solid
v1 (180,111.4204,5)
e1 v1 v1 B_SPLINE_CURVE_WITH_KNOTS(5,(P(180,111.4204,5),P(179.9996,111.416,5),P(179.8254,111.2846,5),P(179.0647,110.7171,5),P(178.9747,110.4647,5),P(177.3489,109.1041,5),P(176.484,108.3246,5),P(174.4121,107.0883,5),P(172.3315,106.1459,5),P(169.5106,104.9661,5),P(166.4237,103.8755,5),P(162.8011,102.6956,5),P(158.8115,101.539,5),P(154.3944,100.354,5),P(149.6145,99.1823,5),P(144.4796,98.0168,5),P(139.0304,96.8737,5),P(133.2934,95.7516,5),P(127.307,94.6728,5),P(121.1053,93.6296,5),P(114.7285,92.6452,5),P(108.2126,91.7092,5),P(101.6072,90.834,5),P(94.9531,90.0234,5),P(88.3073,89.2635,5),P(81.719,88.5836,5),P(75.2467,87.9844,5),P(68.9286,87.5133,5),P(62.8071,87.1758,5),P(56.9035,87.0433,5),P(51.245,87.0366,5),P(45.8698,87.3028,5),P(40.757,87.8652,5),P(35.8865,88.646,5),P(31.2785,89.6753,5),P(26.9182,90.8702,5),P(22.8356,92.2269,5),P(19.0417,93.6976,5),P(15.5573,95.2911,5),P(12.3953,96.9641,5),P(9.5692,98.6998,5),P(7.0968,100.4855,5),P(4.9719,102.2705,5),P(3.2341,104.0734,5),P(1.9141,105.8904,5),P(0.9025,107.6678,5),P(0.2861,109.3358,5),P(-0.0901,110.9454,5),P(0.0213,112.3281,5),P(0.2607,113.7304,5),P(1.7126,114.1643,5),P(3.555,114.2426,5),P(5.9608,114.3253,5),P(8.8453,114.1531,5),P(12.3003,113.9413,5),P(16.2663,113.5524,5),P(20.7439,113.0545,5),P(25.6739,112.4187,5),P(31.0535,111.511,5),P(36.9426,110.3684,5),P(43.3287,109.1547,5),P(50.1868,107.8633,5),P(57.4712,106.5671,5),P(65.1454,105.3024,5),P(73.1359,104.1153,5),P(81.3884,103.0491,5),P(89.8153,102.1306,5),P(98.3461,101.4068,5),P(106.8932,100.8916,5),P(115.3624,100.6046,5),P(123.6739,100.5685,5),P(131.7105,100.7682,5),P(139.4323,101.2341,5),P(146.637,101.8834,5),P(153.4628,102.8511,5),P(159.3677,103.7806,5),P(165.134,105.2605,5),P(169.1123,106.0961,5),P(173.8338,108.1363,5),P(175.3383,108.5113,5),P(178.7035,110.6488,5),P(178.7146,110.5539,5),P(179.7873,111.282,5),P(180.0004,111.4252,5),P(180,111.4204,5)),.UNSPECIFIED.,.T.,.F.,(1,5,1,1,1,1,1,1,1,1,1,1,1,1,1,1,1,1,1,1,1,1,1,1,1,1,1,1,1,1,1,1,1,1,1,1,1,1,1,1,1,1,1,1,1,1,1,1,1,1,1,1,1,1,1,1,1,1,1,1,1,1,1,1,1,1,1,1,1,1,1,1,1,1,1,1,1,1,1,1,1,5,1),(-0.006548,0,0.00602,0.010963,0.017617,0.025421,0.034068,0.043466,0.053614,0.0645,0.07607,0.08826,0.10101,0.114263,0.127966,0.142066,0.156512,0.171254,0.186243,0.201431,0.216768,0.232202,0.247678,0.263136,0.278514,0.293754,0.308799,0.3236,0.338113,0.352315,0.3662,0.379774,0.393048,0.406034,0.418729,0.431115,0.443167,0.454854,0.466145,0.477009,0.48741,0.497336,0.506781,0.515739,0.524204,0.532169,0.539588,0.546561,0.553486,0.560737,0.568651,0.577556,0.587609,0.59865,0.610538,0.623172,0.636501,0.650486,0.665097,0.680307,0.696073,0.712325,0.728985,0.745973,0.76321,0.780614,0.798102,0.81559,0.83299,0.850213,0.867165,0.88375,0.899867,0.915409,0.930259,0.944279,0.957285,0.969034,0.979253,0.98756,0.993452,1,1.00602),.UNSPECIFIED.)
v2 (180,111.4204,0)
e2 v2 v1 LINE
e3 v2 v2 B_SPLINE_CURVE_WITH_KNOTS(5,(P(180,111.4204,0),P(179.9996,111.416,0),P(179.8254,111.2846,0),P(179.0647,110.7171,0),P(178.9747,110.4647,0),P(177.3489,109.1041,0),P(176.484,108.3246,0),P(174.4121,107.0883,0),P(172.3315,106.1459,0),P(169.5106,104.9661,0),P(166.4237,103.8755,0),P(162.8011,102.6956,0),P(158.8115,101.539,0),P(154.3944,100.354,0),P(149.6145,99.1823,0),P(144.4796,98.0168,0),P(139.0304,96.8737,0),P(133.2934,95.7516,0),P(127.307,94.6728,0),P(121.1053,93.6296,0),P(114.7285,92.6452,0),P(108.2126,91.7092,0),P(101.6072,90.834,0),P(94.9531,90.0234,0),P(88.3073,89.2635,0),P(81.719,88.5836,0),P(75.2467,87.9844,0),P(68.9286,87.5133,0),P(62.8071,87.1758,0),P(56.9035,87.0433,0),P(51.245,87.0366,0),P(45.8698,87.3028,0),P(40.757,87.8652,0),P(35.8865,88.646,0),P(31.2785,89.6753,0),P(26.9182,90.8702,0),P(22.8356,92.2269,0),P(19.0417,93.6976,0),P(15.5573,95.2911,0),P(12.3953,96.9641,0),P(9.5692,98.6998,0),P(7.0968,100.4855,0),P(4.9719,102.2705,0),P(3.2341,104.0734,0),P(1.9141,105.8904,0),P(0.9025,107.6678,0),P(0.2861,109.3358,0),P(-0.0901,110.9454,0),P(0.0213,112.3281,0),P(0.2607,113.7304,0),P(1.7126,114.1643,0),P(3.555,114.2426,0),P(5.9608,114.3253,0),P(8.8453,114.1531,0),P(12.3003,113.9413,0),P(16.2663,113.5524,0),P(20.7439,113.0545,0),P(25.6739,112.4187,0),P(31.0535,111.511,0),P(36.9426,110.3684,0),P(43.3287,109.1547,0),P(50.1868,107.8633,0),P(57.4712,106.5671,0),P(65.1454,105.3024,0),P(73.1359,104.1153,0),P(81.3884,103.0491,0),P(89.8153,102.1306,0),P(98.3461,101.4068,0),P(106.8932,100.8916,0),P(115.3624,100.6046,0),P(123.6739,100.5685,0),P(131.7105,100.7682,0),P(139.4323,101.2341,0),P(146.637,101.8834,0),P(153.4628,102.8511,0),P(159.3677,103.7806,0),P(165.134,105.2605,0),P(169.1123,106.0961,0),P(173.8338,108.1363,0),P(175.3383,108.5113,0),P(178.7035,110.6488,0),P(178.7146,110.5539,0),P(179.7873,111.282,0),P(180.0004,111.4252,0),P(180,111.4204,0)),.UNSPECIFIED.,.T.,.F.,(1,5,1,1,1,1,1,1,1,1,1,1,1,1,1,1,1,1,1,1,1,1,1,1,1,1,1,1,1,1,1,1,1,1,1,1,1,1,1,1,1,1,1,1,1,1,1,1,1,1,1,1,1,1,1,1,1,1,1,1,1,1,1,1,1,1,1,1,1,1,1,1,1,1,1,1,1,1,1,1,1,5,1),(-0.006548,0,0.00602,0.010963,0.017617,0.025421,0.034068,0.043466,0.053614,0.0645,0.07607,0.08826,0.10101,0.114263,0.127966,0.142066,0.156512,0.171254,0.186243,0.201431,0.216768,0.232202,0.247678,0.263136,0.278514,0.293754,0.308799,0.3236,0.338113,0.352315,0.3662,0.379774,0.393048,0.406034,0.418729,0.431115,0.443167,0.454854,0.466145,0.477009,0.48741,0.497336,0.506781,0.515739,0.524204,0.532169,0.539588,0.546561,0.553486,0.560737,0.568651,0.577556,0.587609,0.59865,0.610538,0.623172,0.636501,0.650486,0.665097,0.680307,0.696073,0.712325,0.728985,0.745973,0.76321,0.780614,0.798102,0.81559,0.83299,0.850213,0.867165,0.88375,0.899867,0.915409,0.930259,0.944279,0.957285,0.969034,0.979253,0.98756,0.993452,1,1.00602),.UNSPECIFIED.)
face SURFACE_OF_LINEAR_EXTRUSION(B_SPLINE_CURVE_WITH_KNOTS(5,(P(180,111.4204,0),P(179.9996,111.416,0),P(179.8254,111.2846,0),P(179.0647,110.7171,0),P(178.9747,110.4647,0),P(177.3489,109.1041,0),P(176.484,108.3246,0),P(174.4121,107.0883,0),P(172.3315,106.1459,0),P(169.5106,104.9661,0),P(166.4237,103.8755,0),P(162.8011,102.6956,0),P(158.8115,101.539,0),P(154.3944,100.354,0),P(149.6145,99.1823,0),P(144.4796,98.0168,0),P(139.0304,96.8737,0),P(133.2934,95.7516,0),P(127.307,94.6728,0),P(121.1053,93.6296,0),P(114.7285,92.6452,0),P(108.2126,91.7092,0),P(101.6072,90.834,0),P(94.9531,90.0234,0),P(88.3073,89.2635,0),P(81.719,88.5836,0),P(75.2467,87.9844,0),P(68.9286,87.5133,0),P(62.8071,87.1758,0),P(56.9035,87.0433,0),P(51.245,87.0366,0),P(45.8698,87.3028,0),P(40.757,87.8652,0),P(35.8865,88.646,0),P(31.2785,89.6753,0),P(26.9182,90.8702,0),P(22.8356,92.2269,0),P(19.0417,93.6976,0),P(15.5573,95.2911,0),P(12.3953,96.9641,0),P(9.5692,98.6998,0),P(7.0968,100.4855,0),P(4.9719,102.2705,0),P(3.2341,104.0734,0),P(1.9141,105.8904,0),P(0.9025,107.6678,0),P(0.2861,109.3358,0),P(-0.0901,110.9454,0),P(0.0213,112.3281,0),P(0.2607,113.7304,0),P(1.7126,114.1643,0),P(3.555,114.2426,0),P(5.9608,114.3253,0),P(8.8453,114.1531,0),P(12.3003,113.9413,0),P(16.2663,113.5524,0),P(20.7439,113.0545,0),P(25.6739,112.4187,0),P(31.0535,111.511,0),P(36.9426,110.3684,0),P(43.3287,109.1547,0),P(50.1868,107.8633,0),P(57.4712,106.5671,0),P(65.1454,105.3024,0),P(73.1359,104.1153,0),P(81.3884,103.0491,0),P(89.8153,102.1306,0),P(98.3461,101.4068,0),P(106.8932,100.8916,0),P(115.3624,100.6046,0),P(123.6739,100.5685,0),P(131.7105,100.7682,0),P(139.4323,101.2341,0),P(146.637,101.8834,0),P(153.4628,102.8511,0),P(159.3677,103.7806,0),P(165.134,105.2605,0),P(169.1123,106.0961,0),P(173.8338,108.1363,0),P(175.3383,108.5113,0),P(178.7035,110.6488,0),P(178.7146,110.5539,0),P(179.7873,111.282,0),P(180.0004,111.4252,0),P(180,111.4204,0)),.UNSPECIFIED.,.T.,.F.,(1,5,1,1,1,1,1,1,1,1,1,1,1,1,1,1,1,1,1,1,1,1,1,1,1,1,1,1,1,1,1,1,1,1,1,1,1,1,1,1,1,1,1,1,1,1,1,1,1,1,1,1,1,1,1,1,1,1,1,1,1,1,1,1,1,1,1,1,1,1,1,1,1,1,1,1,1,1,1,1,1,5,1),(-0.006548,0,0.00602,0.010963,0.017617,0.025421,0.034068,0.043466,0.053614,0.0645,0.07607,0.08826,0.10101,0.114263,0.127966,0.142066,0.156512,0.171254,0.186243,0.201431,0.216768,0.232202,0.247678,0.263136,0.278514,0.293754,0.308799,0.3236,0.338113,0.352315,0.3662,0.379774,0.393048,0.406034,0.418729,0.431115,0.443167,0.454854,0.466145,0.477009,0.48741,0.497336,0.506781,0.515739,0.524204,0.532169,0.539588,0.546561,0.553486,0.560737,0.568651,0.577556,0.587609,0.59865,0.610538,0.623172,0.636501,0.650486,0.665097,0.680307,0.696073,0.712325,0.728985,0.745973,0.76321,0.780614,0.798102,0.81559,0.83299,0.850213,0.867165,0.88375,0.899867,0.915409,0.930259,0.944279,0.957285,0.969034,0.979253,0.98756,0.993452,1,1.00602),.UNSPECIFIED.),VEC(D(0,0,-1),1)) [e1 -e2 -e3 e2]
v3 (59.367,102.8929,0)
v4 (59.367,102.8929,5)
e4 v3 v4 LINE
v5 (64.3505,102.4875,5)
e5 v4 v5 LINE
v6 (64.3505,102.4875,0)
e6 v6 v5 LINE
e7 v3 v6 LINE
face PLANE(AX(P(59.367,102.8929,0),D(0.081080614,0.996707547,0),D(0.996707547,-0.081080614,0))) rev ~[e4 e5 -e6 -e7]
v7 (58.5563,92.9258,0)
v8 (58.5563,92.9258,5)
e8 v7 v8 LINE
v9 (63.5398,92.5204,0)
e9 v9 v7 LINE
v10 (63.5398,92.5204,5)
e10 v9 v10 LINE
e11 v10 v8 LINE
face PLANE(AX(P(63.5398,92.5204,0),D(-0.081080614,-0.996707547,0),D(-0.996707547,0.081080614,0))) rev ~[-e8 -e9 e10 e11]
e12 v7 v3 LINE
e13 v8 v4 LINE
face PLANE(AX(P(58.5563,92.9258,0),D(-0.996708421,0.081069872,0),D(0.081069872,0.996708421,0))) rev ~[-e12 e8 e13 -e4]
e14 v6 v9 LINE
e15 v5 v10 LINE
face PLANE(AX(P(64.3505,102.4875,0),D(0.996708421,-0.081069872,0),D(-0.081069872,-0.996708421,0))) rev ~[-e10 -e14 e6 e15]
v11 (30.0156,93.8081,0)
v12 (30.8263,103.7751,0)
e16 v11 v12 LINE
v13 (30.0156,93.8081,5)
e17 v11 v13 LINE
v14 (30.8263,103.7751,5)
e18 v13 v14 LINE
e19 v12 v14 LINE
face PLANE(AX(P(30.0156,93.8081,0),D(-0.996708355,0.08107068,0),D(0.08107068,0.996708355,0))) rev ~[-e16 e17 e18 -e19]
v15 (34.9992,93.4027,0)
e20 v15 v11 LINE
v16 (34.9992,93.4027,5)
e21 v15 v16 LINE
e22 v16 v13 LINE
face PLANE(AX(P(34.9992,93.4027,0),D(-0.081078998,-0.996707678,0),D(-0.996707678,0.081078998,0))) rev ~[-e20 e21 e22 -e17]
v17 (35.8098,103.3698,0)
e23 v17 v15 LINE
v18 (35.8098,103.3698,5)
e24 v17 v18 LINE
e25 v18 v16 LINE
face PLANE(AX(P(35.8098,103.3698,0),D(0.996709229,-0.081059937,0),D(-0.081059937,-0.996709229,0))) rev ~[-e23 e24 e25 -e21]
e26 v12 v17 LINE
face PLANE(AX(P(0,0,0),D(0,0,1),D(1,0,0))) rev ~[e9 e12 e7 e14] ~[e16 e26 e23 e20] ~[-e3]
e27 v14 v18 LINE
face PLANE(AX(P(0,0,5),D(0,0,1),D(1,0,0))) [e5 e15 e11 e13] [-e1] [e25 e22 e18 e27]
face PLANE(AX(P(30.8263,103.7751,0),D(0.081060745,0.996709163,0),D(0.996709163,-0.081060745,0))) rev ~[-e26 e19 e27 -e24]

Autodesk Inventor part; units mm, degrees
ref_plane "YZ Plane" through (0, 0, 0) normal (1, 0, 0) x (0, 1, 0)
ref_plane "XZ Plane" through (0, 0, 0) normal (0, 1, 0) x (-1, 0, 0)
ref_plane "XY Plane" through (0, 0, 0) normal (0, 0, 1) x (1, 0, 0)
sketch "Sketch2" plane through (0, 0, 0) normal (0, 0, 1) x (1, 0, 0)
  spline S0 degree 5 poles (180, 111.4204) (179.9996, 111.416) (179.8254, 111.2846) (179.0647, 110.7171) (178.9747, 110.4647) (177.3489, 109.1041) (176.484, 108.3246) (174.4121, 107.0883) (172.3315, 106.1459) (169.5106, 104.9661) (166.4237, 103.8755) (162.8011, 102.6956) (158.8115, 101.539) (154.3944, 100.354) (149.6145, 99.1823) (144.4796, 98.0168) (139.0304, 96.8737) (133.2934, 95.7516) (127.307, 94.6728) (121.1053, 93.6296) (114.7285, 92.6452) (108.2126, 91.7092) (101.6072, 90.834) (94.9531, 90.0234) (88.3073, 89.2635) (81.719, 88.5836) (75.2467, 87.9844) (68.9286, 87.5133) (62.8071, 87.1758) (56.9035, 87.0433) (51.245, 87.0366) (45.8698, 87.3028) (40.757, 87.8652) (35.8865, 88.646) (31.2785, 89.6753) (26.9182, 90.8702) (22.8356, 92.2269) (19.0417, 93.6976) (15.5573, 95.2911) (12.3953, 96.9641) (9.5692, 98.6998) (7.0968, 100.4855) (4.9719, 102.2705) (3.2341, 104.0734) (1.9141, 105.8904) (0.9025, 107.6678) (0.2861, 109.3358) (-0.0901, 110.9454) (0.0213, 112.3281) (0.2607, 113.7304) (1.7126, 114.1643) (3.555, 114.2426) (5.9608, 114.3253) (8.8453, 114.1531) (12.3003, 113.9413) (16.2663, 113.5524) (20.7439, 113.0545) (25.6739, 112.4187) (31.0535, 111.511) (36.9426, 110.3684) (43.3287, 109.1547) (50.1868, 107.8633) (57.4712, 106.5671) (65.1454, 105.3024) (73.1359, 104.1153) (81.3884, 103.0491) (89.8153, 102.1306) (98.3461, 101.4068) (106.8932, 100.8916) (115.3624, 100.6046) (123.6739, 100.5685) (131.7105, 100.7682) (139.4323, 101.2341) (146.637, 101.8834) (153.4628, 102.8511) (159.3677, 103.7806) (165.134, 105.2605) (169.1123, 106.0961) (173.8338, 108.1363) (175.3383, 108.5113) (178.7035, 110.6488) (178.7146, 110.5539) (179.7873, 111.282) (180.0004, 111.4252) (180, 111.4204) knots 0 0 0 0 0 0 0.00602 0.010963 0.017617 0.025421 0.034068 0.043466 0.053614 0.0645 0.07607 0.08826 0.10101 0.114263 0.127966 0.142066 0.156512 0.171254 0.186243 0.201431 0.216768 0.232202 0.247678 0.263136 0.278514 0.293754 0.308799 0.3236 0.338113 0.352315 0.3662 0.379774 0.393048 0.406034 0.418729 0.431115 0.443167 0.454854 0.466145 0.477009 0.48741 0.497336 0.506781 0.515739 0.524204 0.532169 0.539588 0.546561 0.553486 0.560737 0.568651 0.577556 0.587609 0.59865 0.610538 0.623172 0.636501 0.650486 0.665097 0.680307 0.696073 0.712325 0.728985 0.745973 0.76321 0.780614 0.798102 0.81559 0.83299 0.850213 0.867165 0.88375 0.899867 0.915409 0.930259 0.944279 0.957285 0.969034 0.979253 0.98756 0.993452 1 1 1 1 1 1
  line L0 (180, 96.6734) -> (180, 97.127)
  line L1 (35.8098, 103.3698) -> (34.9992, 93.4027)
  line L2 (34.9992, 93.4027) -> (30.0156, 93.8081)
  line L3 (30.0156, 93.8081) -> (30.8263, 103.7751)
  line L4 (30.8263, 103.7751) -> (35.8098, 103.3698)
  line L5 (64.3505, 102.4875) -> (63.5398, 92.5204)
  line L6 (63.5398, 92.5204) -> (58.5563, 92.9258)
  line L7 (58.5563, 92.9258) -> (59.367, 102.8929)
  line L8 (59.367, 102.8929) -> (64.3505, 102.4875)
  point P0 (178.9506, 110.5312)
  point P1 (177.885, 109.5538)
  point P2 (176.535, 108.4576)
  point P3 (174.7998, 107.3704)
  point P4 (172.5912, 106.285)
  point P5 (169.9002, 105.1636)
  point P6 (166.7502, 104.0116)
  point P7 (163.1538, 102.838)
  point P8 (159.1308, 101.6518)
  point P9 (154.7046, 100.4602)
  point P10 (149.8986, 99.2722)
  point P11 (144.7416, 98.0968)
  point P12 (139.2642, 96.9412)
  point P13 (133.4988, 95.8126)
  point P14 (127.4814, 94.7218)
  point P15 (121.248, 93.6742)
  point P16 (114.8364, 92.6788)
  point P17 (108.2844, 91.7374)
  point P18 (101.637, 90.8554)
  point P19 (94.9392, 90.0346)
  point P20 (88.245, 89.275)
  point P21 (81.612, 88.591)
  point P22 (75.0978, 88.0006)
  point P23 (68.7474, 87.5326)
  point P24 (62.5986, 87.2158)
  point P25 (56.6784, 87.0736)
  point P26 (51.0246, 87.1114)
  point P27 (45.666, 87.3976)
  point P28 (40.5738, 87.9538)
  point P29 (35.7228, 88.7512)
  point P30 (31.1148, 89.7736)
  point P31 (26.7534, 90.9814)
  point P32 (22.6638, 92.344)
  point P33 (18.8676, 93.8344)
  point P34 (15.381, 95.4382)
  point P35 (12.2202, 97.1284)
  point P36 (9.4014, 98.8834)
  point P37 (6.939, 100.678)
  point P38 (4.8492, 102.4816)
  point P39 (3.159, 104.2906)
  point P40 (1.8504, 106.1032)
  point P41 (0.891, 107.8762)
  point P42 (0.279, 109.561)
  point P43 (0.009, 111.1)
  point P44 (0.0792, 112.4302)
  point P45 (0.4752, 113.4364)
  point P46 (1.4202, 113.989)
  point P47 (3.0924, 114.2104)
  point P48 (5.4108, 114.2716)
  point P49 (8.3286, 114.178)
  point P50 (11.8098, 113.9476)
  point P51 (15.8166, 113.584)
  point P52 (20.3076, 113.0854)
  point P53 (25.236, 112.4338)
  point P54 (30.6108, 111.5554)
  point P55 (36.5004, 110.4574)
  point P56 (42.912, 109.237)
  point P57 (49.8114, 107.95)
  point P58 (57.15, 106.6468)
  point P59 (64.8792, 105.376)
  point P60 (72.9342, 104.1826)
  point P61 (81.2502, 103.108)
  point P62 (89.748, 102.1882)
  point P63 (98.3502, 101.4592)
  point P64 (106.9704, 100.9444)
  point P65 (115.5168, 100.6636)
  point P66 (123.8976, 100.6312)
  point P67 (132.0192, 100.8508)
  point P68 (139.788, 101.3188)
  point P69 (147.1122, 102.0262)
  point P70 (153.9, 102.9496)
  point P71 (160.0704, 104.062)
  point P72 (165.5388, 105.3238)
  point P73 (170.2314, 106.6972)
  point P74 (174.0474, 108.1408)
  point P75 (176.859, 109.5124)
  point P76 (178.6824, 110.578)
  point P77 (179.685, 111.2134)
  point P78 (95.0285, 99.5434)
extrude "Extrusion1" add sketch "Sketch2" along normal blind 5
properties part number "horizontal air foil"
